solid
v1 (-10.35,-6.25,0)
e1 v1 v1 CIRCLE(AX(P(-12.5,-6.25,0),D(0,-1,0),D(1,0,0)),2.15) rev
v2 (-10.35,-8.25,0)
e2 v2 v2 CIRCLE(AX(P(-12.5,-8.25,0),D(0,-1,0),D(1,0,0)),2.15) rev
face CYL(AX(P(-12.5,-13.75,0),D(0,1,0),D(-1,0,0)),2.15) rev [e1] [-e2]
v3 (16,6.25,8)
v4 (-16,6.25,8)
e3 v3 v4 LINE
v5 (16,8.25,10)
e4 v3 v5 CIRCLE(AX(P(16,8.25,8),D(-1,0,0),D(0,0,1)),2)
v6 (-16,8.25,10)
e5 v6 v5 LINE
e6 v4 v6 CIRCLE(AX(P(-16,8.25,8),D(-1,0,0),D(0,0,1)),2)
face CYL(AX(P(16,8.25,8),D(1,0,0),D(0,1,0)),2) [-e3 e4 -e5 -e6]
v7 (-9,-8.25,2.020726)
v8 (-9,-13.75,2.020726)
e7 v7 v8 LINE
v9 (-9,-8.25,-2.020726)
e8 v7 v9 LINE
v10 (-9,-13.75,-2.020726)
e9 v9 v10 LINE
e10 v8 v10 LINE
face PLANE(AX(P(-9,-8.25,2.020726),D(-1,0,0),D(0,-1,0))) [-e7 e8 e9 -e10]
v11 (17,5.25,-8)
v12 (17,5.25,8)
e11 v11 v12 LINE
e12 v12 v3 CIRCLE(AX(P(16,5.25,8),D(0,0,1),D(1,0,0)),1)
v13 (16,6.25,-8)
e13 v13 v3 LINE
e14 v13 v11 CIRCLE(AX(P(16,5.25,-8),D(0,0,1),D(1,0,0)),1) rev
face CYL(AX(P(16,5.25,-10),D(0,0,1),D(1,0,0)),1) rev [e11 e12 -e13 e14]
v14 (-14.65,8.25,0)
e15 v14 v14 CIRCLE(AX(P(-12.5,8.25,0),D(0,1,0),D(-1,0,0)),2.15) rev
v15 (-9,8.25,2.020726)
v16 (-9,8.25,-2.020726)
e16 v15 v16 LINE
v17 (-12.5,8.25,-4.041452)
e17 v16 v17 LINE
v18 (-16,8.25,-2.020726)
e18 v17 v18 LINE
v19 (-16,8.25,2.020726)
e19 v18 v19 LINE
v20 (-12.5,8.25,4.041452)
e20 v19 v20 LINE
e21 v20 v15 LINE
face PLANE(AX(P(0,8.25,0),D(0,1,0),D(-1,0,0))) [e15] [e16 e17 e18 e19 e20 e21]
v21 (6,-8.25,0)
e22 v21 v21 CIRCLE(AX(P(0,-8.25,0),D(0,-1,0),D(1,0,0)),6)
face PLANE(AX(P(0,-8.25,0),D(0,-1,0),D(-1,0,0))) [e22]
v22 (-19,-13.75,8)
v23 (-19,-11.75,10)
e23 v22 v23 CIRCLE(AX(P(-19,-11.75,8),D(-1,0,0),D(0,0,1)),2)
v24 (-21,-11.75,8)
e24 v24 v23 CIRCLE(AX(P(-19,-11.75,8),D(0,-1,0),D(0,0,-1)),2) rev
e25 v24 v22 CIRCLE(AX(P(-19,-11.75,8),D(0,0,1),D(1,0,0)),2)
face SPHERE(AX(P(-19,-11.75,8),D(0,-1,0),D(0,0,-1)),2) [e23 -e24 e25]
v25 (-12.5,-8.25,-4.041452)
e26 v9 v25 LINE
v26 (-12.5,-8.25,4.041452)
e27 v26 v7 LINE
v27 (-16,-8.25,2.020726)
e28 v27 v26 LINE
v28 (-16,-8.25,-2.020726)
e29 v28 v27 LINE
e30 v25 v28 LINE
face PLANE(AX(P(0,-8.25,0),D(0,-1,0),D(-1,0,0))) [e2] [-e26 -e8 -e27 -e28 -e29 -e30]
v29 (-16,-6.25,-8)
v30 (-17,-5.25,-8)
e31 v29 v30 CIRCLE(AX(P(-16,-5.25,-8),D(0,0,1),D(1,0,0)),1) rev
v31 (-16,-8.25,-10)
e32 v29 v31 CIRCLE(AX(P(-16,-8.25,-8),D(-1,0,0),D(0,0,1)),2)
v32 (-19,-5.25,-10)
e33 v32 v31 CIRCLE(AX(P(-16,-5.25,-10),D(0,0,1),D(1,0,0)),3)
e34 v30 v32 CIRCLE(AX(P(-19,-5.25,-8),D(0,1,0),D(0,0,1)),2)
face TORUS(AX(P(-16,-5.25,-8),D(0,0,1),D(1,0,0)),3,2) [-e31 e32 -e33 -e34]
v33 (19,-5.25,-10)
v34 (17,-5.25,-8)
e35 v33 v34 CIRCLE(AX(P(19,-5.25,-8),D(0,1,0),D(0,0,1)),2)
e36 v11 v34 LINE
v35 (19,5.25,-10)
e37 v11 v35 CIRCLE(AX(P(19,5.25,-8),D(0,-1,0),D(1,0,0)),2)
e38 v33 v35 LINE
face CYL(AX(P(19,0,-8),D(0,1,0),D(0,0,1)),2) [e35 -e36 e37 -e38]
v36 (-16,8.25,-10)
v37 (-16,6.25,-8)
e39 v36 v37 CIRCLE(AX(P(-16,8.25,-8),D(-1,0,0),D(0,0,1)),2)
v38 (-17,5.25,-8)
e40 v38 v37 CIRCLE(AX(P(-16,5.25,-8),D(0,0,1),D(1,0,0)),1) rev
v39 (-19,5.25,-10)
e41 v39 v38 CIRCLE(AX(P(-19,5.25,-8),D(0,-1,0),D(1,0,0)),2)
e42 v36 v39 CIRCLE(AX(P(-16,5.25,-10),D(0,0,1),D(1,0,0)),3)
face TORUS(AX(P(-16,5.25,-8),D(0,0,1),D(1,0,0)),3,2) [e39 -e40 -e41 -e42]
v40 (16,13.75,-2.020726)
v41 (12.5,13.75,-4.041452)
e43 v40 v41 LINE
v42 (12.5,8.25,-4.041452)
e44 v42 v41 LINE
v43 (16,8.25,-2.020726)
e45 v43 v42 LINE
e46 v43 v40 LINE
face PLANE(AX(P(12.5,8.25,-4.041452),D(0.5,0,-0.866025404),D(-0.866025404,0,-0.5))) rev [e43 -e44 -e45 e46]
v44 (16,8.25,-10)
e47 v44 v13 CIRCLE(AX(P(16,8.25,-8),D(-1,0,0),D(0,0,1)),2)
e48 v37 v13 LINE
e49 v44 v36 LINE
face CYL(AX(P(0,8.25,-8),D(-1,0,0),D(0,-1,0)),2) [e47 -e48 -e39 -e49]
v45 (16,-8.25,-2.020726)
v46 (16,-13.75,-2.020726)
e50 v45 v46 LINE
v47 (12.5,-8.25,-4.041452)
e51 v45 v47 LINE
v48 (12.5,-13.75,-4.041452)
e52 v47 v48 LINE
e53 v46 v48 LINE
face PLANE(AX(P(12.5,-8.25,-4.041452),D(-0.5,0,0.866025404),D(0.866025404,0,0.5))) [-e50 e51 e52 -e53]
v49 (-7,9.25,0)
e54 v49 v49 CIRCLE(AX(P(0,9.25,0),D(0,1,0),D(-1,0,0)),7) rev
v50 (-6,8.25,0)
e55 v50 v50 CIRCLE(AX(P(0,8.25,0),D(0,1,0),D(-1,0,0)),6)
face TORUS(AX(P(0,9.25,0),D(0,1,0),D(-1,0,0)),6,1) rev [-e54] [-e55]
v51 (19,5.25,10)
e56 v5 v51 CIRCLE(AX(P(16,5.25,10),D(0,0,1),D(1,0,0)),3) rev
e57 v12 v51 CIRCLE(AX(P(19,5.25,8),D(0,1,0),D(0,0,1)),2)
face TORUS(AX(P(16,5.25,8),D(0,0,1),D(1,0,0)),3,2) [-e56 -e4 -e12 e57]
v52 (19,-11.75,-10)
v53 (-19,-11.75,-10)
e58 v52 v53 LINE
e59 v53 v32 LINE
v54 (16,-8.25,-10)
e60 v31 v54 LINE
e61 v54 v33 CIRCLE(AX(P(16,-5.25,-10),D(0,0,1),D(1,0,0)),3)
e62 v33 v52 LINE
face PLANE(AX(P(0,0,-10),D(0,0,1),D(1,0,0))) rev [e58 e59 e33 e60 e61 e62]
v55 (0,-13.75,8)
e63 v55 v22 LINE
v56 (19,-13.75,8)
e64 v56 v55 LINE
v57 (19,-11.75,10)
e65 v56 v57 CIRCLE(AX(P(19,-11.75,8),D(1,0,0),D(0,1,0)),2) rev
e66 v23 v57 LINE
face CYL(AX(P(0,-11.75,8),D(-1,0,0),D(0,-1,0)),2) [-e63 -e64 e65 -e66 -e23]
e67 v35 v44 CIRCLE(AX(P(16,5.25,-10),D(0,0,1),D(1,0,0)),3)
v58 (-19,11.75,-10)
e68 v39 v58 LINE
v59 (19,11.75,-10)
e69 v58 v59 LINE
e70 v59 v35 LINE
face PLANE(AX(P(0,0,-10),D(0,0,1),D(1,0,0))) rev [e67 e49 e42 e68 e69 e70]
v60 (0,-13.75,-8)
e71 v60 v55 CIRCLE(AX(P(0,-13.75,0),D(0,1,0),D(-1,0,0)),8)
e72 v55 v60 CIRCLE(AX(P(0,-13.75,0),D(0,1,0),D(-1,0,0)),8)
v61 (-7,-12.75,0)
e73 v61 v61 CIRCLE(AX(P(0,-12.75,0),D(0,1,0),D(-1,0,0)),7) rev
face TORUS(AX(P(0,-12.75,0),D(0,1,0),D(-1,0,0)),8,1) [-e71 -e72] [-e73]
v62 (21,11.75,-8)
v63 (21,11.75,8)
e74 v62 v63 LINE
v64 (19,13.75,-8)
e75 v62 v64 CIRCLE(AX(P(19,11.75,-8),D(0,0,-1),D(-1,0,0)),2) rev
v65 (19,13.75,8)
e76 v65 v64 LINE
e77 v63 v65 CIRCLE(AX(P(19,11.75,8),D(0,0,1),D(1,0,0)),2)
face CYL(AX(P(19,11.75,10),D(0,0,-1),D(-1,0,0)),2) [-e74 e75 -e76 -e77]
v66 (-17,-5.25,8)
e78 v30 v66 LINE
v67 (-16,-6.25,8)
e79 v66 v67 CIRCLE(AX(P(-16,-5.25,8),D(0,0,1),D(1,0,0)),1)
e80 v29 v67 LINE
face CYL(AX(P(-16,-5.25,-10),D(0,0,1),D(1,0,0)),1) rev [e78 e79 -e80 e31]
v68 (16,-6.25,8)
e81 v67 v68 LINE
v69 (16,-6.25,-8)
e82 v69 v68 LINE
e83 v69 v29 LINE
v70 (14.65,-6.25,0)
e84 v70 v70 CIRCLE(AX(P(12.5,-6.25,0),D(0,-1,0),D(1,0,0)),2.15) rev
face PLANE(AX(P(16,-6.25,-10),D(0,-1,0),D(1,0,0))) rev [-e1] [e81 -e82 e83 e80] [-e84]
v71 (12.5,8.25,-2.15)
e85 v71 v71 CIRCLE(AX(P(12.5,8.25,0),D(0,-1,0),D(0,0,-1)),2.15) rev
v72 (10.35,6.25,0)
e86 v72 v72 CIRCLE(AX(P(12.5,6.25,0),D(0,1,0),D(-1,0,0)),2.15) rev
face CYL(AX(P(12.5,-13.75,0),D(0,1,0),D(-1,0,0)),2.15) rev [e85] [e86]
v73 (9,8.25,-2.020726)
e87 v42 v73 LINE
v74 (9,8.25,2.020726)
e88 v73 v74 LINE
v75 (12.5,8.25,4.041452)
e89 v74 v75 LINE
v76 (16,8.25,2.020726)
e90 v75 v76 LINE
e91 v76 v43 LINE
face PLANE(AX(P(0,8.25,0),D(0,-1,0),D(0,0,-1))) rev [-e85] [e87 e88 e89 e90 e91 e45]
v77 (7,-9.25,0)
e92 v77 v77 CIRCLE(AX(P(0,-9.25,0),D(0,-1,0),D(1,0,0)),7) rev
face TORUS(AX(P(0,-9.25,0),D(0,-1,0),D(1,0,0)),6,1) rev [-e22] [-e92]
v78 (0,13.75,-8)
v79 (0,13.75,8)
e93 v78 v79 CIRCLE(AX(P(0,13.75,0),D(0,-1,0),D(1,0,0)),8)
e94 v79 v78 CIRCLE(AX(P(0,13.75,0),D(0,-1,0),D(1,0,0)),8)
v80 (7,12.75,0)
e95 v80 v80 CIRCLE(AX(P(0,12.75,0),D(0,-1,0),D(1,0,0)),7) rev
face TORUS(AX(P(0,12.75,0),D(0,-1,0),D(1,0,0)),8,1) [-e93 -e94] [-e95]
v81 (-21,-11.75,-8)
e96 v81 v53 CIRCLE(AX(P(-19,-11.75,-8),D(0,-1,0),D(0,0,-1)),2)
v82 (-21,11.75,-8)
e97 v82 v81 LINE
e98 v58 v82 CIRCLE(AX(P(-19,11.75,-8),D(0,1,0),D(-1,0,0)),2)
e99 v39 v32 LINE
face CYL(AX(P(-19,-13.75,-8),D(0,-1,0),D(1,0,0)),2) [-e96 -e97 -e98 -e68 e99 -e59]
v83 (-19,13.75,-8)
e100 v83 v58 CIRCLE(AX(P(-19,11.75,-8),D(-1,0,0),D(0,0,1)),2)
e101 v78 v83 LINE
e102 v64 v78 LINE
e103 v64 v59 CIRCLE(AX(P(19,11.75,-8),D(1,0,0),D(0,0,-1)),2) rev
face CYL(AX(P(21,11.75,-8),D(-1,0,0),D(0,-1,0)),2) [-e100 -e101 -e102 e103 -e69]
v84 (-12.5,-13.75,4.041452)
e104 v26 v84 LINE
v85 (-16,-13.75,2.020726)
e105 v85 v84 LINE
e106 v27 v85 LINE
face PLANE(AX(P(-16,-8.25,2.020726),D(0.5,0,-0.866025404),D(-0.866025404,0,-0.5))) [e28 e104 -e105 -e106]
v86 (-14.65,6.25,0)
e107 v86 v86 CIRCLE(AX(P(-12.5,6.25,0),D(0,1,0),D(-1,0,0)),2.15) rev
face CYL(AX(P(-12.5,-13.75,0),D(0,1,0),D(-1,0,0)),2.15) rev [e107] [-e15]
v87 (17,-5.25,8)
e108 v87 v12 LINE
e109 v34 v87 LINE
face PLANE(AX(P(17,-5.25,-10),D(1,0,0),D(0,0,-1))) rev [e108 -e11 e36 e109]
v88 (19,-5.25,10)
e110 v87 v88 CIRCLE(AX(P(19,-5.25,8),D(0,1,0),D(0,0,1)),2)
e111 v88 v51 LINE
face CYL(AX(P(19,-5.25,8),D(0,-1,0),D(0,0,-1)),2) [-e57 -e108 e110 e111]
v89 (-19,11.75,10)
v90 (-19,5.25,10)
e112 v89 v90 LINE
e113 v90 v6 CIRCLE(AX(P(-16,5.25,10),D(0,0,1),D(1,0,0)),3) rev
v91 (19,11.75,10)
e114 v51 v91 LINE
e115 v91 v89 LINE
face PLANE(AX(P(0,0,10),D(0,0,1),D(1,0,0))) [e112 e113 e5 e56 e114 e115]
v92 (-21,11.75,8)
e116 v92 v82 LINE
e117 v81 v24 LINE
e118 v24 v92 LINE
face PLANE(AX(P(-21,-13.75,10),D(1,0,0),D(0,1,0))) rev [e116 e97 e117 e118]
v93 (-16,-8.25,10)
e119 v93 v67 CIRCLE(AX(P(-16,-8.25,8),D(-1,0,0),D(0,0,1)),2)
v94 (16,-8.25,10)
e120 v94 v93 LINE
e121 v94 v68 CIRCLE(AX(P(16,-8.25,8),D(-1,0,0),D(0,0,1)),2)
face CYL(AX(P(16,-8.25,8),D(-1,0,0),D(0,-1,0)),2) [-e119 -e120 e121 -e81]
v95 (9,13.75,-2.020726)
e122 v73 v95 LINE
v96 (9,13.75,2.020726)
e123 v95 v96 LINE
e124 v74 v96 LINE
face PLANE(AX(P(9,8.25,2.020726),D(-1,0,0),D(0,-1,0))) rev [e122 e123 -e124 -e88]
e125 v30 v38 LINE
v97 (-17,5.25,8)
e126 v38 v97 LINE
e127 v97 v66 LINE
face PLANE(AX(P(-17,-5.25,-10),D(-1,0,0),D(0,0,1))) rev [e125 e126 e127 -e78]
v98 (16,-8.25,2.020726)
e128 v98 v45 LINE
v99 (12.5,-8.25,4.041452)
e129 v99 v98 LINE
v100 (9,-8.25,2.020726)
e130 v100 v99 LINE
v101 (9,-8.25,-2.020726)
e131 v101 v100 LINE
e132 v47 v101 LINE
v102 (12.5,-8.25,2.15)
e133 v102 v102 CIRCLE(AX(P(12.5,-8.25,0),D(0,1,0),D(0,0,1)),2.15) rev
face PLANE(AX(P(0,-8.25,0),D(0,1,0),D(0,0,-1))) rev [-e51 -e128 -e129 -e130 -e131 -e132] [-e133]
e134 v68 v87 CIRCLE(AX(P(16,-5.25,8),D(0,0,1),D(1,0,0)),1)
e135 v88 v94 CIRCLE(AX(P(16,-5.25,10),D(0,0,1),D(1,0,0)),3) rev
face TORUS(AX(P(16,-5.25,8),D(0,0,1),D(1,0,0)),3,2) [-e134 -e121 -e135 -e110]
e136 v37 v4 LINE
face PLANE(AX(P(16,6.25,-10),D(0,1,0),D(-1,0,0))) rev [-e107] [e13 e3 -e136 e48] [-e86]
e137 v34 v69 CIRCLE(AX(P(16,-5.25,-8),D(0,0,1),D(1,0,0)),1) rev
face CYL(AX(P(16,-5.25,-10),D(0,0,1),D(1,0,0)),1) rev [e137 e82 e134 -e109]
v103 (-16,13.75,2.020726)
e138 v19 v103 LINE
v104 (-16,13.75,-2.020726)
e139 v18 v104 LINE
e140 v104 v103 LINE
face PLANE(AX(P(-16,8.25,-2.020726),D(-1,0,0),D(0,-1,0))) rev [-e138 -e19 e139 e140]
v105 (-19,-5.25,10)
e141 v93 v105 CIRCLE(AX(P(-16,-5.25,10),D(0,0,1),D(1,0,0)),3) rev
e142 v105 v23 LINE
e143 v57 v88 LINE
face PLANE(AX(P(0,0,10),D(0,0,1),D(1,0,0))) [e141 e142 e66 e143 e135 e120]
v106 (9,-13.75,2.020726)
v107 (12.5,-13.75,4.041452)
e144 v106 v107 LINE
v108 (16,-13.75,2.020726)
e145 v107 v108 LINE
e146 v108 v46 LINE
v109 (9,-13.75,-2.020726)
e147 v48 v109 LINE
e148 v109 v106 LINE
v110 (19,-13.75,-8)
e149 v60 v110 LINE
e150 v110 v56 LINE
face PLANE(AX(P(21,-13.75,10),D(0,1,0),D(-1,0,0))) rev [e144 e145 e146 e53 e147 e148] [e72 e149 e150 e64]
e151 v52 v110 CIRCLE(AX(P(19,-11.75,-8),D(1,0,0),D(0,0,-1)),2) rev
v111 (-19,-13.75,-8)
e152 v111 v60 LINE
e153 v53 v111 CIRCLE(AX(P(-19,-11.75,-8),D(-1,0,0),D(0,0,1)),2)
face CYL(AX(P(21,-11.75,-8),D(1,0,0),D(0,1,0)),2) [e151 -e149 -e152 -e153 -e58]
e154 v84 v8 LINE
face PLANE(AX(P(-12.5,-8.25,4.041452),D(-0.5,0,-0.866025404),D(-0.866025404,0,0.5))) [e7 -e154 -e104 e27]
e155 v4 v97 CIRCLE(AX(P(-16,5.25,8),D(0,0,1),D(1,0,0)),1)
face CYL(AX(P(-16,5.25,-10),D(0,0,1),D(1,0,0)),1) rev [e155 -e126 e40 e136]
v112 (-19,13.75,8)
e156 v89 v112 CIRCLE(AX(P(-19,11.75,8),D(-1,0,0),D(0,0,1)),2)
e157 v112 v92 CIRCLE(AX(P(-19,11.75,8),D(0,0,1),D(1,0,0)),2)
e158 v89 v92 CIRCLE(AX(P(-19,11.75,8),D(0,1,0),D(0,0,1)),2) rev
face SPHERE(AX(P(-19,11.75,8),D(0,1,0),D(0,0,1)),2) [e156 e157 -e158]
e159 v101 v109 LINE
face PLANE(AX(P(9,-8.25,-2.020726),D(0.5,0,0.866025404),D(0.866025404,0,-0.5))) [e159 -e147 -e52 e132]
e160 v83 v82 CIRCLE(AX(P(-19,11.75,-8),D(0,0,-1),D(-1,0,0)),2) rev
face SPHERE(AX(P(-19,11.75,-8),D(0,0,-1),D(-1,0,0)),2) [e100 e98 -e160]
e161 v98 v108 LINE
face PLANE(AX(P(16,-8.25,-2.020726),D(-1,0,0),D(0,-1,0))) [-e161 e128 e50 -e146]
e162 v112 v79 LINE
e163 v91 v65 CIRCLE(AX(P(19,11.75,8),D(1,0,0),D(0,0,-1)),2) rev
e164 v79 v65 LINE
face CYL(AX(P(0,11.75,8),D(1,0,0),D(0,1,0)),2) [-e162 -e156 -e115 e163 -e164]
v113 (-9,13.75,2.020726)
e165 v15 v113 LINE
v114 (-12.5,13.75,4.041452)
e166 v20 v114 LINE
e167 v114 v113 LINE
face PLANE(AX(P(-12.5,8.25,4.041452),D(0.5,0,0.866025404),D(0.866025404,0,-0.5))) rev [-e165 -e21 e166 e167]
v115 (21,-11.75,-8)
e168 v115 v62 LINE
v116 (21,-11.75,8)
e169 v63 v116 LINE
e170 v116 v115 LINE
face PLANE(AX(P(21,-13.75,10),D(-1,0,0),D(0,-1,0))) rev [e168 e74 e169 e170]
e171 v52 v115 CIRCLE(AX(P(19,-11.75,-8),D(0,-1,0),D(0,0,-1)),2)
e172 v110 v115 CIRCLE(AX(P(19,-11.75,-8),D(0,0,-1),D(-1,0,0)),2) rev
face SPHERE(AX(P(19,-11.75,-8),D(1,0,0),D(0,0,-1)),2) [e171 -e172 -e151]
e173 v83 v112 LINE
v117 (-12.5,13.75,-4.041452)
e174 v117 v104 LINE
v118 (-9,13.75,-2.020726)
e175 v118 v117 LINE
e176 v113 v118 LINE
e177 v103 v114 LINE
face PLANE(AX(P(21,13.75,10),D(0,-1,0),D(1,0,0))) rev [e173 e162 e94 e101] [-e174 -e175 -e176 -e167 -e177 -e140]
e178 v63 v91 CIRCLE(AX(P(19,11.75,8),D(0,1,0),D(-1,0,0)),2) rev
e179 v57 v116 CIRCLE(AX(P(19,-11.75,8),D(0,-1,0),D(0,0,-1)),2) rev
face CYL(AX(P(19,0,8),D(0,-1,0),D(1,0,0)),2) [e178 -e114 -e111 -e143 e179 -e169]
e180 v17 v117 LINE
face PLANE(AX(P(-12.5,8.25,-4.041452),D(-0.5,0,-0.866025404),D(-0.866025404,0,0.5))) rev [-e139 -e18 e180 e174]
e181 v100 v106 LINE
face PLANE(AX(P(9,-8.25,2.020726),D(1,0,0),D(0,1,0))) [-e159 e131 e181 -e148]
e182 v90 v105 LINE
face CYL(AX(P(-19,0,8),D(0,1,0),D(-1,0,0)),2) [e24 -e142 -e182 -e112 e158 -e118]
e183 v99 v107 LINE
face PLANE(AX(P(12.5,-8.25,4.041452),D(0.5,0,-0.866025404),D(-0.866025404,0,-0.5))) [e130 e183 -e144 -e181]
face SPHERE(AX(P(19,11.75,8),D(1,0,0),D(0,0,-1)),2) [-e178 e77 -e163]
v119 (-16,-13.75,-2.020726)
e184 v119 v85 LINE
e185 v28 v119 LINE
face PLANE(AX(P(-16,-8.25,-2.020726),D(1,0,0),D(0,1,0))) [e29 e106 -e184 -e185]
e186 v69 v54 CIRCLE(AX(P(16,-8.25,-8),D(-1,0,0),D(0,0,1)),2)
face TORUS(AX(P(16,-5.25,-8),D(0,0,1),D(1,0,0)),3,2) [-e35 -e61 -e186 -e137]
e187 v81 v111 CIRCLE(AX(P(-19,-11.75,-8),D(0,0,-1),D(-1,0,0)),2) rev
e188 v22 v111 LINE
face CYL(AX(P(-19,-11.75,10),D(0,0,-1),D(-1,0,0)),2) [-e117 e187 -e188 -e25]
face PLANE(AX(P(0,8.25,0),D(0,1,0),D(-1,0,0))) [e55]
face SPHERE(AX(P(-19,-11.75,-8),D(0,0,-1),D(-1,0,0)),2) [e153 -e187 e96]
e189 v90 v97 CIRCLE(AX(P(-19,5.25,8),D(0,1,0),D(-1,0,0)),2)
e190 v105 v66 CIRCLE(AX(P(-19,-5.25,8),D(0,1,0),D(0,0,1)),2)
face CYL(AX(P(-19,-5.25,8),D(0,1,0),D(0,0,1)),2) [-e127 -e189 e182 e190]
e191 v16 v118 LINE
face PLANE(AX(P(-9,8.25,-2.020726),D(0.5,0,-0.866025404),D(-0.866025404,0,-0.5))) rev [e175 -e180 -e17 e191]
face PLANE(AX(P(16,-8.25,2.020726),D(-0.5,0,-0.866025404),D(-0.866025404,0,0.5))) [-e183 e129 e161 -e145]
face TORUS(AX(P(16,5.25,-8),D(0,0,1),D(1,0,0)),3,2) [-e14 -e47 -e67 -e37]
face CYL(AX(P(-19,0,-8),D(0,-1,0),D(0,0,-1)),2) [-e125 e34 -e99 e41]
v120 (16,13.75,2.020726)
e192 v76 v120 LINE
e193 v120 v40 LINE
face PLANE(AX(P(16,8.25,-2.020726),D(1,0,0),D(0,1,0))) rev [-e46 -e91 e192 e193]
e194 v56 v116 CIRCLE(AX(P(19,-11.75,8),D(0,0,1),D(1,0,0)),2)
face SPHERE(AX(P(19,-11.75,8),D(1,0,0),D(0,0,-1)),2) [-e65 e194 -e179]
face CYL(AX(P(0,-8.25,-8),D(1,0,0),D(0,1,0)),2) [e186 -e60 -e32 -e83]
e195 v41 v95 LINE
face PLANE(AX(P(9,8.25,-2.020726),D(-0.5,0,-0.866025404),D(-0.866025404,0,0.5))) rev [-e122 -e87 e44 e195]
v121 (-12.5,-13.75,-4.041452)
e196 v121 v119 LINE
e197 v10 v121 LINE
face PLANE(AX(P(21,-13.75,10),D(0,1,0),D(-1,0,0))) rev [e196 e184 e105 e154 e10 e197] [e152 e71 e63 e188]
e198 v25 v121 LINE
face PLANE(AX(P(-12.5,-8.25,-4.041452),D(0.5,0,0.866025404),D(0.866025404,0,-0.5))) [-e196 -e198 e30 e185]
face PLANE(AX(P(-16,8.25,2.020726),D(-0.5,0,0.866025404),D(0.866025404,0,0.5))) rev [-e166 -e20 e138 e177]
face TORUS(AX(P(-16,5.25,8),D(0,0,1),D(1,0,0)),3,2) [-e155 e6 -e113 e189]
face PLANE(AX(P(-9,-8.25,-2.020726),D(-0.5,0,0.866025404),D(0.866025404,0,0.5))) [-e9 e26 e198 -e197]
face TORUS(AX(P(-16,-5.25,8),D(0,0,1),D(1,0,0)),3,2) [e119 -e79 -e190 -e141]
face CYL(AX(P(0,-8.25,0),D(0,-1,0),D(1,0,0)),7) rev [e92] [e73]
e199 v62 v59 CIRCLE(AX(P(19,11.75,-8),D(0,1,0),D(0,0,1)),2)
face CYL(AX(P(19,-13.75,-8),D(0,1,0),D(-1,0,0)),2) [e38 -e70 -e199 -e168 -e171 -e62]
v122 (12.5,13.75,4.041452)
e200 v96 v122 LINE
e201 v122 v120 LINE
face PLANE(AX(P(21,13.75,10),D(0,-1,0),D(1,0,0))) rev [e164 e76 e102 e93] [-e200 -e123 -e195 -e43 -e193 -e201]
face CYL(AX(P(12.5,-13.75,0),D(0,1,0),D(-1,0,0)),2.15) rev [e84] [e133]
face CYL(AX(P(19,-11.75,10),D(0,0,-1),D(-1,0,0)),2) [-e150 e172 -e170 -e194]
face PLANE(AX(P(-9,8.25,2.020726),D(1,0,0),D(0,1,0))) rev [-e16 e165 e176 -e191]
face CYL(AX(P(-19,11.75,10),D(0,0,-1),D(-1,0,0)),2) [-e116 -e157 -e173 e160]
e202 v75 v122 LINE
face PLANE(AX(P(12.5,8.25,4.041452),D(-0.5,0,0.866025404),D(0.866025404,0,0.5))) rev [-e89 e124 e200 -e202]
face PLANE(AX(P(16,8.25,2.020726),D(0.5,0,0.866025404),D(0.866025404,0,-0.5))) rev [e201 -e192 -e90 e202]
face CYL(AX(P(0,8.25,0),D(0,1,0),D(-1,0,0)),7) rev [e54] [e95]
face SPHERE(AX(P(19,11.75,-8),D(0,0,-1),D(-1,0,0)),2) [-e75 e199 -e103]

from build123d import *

# Parameters (mm, degrees)
SKETCH_1_W               = 42
SKETCH_1_H               = 27.5
EXTRUDE_1_DEPTH          = 10
CUT_EXTRUDE_1_DEPTH      = 37.017356927
CUT_EXTRUDE_1_DEPTH_BACK = 37.017356927
SKETCH_2_R               = 2.15
SKETCH_3_R               = 7
CUT_EXTRUDE_2_DEPTH      = 5.5
CUT_EXTRUDE_4_DEPTH      = 28.019668762
CUT_EXTRUDE_4_DEPTH_BACK = 28.019668762
FILLET_1_R               = 2
FILLET_3_R               = 1


with BuildPart() as part:
    # 草图1 → 凸台-拉伸1 (new, symmetric)
    with BuildSketch(Plane.XY):
        Rectangle(SKETCH_1_W, SKETCH_1_H)
    extrude(amount=EXTRUDE_1_DEPTH, both=True)

    # 草图2 → 切除-拉伸1 (cut, two sides: drawn at the far end of the back side and taken through both)
    with BuildSketch(Plane(origin=(0, 13.75, 0), x_dir=(1, 0, 0), z_dir=(0, 1, 0)).offset(-CUT_EXTRUDE_1_DEPTH_BACK)):
        with Locations(Location((-12.5, 0, 0), (0, 0, 180))):
            Circle(SKETCH_2_R)
        with Locations(Location((12.5, 0, 0), (0, 0, 180))):
            Circle(SKETCH_2_R)
    extrude(amount=CUT_EXTRUDE_1_DEPTH + CUT_EXTRUDE_1_DEPTH_BACK, mode=Mode.SUBTRACT)

    # 草图3 → 切除-拉伸2 (cut)
    with BuildSketch(Plane(origin=(0, 13.75, 0), x_dir=(1, 0, 0), z_dir=(0, 1, 0))):
        with Locations(Location((0, 0, 0), (0, 0, 180))):
            Circle(SKETCH_3_R)
        Polygon((-9, -2.020725942), (-9, 2.020725942), (-12.5, 4.041451884), (-16, 2.020725942), (-16, -2.020725942), (-12.5, -4.041451884), align=None)
        Polygon((12.5, -4.041451884), (9, -2.020725942), (9, 2.020725942), (12.5, 4.041451884), (16, 2.020725942), (16, -2.020725942), align=None)
    cut_extrude_2 = extrude(amount=-CUT_EXTRUDE_2_DEPTH, mode=Mode.SUBTRACT)

    # 镜向2: 切除-拉伸2 across plane
    add(cut_extrude_2.mirror(Plane.ZX), mode=Mode.SUBTRACT)

    # 草图5 → 切除-拉伸4 (cut, two sides: drawn at the far end of the back side and taken through both)
    with BuildSketch(Plane.XY.offset(-CUT_EXTRUDE_4_DEPTH_BACK)):
        with BuildLine():
            Line((16, -6.25), (-16, -6.25))
            ThreePointArc((-16, -6.25), (-16.707106781, -5.957106781), (-17, -5.25))
            Line((-17, -5.25), (-17, 5.25))
            ThreePointArc((-17, 5.25), (-16.707106781, 5.957106781), (-16, 6.25))
            Line((-16, 6.25), (16, 6.25))
            ThreePointArc((16, 6.25), (16.707106781, 5.957106781), (17, 5.25))
            Line((17, 5.25), (17, -5.25))
            ThreePointArc((17, -5.25), (16.707106781, -5.957106781), (16, -6.25))
        make_face()
    extrude(amount=CUT_EXTRUDE_4_DEPTH + CUT_EXTRUDE_4_DEPTH_BACK, mode=Mode.SUBTRACT)

    # 圆角1
    fillet_1_edges = [part.edges().sort_by_distance(p)[0] for p in [
        (0, -6.25, -10),
        (0, 6.25, -10),
        (16.707106781, -5.957106781, -10),
        (-16.707106781, -5.957106781, -10),
        (-17, 0, -10),
        (-16.707106781, 5.957106781, -10),
        (16.707106781, 5.957106781, -10),
        (17, 0, -10),
        (16.707106781, -5.957106781, 10),
        (17, 0, 10),
        (16.707106781, 5.957106781, 10),
        (0, 6.25, 10),
        (-16.707106781, 5.957106781, 10),
        (-17, 0, 10),
        (-16.707106781, -5.957106781, 10),
        (0, -6.25, 10),
        (21, 0, 10),
        (0, 13.75, 10),
        (-21, 0, 10),
        (0, 13.75, -10),
        (21, 0, -10),
        (0, -13.75, -10),
        (-21, 0, -10),
        (-21, 13.75, 0),
        (21, 13.75, 0),
        (21, -13.75, 0),
        (-21, -13.75, 0),
        (0, -13.75, 10),
    ]]
    fillet(fillet_1_edges, radius=FILLET_1_R - 0.0001)  # a hair under: the kernel refuses the full size

    # 圆角3
    fillet_3_edges = [part.edges().sort_by_distance(p)[0] for p in [
        (7, 8.25, 0),
        (7, 13.75, 0),
        (7, -13.75, 0),
        (7, -8.25, 0),
    ]]
    fillet(fillet_3_edges, radius=FILLET_3_R)


solid = part.part
